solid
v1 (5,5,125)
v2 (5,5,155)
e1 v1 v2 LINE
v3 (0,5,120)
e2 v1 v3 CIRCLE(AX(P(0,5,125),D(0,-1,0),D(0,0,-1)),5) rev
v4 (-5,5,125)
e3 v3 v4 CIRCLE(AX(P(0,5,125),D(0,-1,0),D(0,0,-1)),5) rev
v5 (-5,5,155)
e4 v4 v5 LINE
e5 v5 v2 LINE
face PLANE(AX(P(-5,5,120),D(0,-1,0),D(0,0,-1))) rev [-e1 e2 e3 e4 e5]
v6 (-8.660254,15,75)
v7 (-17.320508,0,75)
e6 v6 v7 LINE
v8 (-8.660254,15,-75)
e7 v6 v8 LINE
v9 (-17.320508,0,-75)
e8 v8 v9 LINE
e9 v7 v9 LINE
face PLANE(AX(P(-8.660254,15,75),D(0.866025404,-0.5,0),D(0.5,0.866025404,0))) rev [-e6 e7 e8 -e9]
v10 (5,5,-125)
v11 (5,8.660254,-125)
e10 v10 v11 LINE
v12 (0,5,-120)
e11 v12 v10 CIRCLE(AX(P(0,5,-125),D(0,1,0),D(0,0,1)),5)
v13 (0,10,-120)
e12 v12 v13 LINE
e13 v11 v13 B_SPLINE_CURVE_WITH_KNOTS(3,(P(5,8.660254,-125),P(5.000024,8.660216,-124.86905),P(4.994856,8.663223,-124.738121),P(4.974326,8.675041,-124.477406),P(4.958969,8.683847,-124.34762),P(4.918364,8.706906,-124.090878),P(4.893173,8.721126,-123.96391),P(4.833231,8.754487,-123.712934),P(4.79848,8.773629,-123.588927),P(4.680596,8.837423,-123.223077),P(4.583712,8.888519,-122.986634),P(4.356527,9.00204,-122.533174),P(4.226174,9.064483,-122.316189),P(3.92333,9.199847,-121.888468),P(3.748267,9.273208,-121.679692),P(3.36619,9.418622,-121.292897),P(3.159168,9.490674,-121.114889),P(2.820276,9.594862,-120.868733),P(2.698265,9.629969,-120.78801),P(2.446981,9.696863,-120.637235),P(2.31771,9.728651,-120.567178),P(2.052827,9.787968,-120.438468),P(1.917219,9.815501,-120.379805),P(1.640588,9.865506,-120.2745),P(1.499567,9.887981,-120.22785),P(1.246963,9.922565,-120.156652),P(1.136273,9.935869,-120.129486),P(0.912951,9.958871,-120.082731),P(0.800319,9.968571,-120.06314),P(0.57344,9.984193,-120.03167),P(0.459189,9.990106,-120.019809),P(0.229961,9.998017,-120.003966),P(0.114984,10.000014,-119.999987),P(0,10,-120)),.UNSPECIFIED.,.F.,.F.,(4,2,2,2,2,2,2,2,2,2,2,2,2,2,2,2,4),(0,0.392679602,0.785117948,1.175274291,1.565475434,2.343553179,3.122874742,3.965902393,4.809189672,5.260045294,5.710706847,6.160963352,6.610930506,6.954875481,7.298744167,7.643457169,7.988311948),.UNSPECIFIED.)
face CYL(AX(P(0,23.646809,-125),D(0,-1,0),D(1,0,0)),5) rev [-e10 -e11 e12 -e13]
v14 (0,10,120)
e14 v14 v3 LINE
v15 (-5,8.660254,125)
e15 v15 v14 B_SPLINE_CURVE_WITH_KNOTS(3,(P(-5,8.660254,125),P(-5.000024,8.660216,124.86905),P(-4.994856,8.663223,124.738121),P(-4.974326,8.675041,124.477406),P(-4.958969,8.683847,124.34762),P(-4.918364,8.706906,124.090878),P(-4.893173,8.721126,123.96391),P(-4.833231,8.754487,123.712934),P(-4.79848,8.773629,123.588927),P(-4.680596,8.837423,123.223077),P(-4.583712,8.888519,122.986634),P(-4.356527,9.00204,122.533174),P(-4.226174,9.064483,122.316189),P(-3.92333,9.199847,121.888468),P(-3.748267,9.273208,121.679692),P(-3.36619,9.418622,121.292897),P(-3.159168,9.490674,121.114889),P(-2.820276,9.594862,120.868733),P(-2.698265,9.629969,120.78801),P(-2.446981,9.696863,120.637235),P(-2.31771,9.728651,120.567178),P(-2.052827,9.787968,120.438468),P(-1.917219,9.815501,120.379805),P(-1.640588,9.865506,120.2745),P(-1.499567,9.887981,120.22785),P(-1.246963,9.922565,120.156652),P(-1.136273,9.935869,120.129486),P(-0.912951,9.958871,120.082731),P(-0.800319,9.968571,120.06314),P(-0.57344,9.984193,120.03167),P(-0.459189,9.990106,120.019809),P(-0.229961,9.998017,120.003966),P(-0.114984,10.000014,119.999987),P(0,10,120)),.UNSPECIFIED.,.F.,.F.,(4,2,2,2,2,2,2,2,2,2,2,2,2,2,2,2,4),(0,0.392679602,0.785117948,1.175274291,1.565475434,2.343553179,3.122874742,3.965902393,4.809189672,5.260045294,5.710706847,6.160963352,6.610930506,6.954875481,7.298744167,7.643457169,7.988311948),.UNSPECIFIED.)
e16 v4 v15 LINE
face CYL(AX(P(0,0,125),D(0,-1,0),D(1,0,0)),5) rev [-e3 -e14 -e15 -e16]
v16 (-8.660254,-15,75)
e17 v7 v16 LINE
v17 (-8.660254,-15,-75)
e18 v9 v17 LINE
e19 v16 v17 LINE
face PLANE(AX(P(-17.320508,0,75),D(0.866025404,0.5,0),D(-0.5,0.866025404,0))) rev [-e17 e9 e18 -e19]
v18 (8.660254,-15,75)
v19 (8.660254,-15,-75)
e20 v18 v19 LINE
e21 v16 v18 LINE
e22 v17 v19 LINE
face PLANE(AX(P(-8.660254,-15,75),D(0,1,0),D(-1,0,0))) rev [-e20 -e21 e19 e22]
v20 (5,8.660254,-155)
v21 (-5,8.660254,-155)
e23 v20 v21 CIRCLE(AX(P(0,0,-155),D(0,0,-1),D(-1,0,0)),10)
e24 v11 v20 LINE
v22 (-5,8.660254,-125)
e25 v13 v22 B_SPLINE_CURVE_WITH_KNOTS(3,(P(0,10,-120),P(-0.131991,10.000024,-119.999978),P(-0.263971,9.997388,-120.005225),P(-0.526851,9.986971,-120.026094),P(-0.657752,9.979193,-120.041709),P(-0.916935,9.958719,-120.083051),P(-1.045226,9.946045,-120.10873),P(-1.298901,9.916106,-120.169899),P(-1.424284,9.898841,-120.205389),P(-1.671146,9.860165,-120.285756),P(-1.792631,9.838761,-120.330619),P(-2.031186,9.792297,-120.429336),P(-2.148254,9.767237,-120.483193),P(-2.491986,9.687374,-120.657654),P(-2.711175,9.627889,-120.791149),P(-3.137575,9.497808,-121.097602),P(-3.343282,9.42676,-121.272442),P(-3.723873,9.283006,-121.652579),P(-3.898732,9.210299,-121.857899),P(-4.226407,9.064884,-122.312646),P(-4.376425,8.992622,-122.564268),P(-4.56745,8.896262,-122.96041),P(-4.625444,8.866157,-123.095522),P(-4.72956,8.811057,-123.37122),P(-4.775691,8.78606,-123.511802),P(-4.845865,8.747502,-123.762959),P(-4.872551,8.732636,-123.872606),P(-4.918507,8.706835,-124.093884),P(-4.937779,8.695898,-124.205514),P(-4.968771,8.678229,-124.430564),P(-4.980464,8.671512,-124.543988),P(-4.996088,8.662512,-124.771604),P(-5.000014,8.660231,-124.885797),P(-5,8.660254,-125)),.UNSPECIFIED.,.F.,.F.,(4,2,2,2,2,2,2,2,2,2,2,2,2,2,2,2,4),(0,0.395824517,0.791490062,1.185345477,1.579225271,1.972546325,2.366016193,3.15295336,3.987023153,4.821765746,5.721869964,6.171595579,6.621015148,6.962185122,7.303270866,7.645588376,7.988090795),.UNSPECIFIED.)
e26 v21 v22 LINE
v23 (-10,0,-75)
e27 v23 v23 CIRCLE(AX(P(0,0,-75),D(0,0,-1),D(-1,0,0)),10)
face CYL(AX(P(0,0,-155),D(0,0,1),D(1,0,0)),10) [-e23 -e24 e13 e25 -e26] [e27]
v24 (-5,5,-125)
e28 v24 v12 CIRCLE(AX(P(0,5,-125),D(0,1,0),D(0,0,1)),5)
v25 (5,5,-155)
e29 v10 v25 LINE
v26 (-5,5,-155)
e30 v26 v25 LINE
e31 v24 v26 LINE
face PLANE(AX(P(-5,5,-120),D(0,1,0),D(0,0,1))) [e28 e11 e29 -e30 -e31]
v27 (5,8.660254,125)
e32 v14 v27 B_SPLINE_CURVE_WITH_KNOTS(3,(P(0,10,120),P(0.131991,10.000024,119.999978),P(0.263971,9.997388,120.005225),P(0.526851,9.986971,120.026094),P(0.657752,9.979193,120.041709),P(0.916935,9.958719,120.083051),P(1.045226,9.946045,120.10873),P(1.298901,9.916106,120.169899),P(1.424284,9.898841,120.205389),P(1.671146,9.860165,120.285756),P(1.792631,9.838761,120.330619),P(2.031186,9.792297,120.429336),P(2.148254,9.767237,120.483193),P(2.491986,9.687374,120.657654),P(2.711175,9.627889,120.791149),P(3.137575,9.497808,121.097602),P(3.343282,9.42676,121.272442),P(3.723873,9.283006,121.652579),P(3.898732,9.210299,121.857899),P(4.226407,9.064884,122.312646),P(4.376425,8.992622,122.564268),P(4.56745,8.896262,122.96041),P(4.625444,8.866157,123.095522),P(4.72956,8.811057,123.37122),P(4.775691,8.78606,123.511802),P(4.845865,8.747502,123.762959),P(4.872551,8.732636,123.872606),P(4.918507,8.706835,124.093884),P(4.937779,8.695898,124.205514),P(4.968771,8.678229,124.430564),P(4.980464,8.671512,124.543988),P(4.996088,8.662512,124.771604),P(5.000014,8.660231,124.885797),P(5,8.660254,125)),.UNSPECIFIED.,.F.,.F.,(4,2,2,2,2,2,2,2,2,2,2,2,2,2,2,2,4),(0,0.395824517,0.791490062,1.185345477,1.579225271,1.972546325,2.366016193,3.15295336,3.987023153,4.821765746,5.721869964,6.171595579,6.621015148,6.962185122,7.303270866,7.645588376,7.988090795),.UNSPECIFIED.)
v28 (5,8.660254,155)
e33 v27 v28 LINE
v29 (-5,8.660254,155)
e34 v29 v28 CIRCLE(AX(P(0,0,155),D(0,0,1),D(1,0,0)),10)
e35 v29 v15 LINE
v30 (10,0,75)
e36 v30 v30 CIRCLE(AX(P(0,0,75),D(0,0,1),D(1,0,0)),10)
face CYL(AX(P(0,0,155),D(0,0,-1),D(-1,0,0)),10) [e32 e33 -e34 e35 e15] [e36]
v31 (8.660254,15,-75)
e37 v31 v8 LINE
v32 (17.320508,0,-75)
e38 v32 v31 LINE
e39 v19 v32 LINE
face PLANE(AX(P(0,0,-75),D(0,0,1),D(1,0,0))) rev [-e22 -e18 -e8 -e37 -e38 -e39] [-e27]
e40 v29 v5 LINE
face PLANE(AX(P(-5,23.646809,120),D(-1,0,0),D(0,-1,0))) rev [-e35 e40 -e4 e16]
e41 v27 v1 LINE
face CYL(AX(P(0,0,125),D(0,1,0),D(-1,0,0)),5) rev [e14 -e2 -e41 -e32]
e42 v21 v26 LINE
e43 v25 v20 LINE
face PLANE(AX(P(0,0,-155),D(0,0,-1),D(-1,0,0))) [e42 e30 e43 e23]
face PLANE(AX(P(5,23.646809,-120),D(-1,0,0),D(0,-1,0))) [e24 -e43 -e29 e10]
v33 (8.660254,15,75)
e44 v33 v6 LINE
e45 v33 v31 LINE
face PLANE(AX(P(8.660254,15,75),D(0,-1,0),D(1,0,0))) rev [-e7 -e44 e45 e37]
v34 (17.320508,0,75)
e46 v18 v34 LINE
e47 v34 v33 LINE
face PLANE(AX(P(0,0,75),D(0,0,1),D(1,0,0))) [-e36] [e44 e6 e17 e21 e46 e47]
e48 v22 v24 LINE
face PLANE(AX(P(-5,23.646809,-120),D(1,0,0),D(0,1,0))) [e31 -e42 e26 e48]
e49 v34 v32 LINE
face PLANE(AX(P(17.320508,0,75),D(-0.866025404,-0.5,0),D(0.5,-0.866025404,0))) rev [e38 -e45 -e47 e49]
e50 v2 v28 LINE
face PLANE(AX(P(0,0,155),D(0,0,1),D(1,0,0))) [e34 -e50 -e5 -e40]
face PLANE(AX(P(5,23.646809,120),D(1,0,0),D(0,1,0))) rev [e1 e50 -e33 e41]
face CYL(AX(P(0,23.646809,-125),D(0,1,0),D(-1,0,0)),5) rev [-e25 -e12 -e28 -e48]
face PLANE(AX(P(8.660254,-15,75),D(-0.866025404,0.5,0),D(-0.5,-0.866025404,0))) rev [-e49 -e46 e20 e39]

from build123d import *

# Parameters (mm, degrees)
BOSS_EXTRUDE1_DEPTH  = 75
SKETCH2_R            = 10
BOSS_EXTRUDE2_DEPTH  = 80
BOSS_EXTRUDE3_START  = 80
SKETCH3_R            = 10
BOSS_EXTRUDE3_DEPTH  = 80
SKETCH4_W            = 10
SKETCH4_H            = 18.646809019
CUT_EXTRUDE1_DEPTH   = 35
FILLET1_R            = 5
FILLET1_OF_MIRROR1_R = 5


with BuildPart() as part:
    # Sketch1 → Boss-Extrude1 (new, symmetric)
    with BuildSketch(Plane.XY):
        Polygon((8.660254038, 15), (-8.660254038, 15), (-17.320508076, 0), (-8.660254038, -15), (8.660254038, -15), (17.320508076, 0), align=None)
    extrude(amount=BOSS_EXTRUDE1_DEPTH, both=True)

    # Sketch2 → Boss-Extrude2 (add)
    with BuildSketch(Plane.XY.offset(75)):
        Circle(SKETCH2_R)
    extrude(amount=BOSS_EXTRUDE2_DEPTH)

    # Sketch3 → Boss-Extrude3 (add)
    with BuildSketch(Plane(origin=(0, 0, -75), x_dir=(-1, 0, 0), z_dir=(0, 0, -1)).offset(BOSS_EXTRUDE3_START)):
        with Locations(Location((0, 0, 0), (0, 0, 180))):
            Circle(SKETCH3_R)
    extrude(amount=-BOSS_EXTRUDE3_DEPTH)

    # Sketch4 → Cut-Extrude1 (cut)
    with BuildSketch(Plane.XY.offset(155)):
        with Locations((0, 14.32340451)):
            Rectangle(SKETCH4_W, SKETCH4_H)
    cut_extrude1 = extrude(amount=-CUT_EXTRUDE1_DEPTH, mode=Mode.SUBTRACT)

    # Fillet1
    fillet1_edges = [part.edges().sort_by_distance(p)[0] for p in [
        (5, 6.830127019, 120),
        (-5, 6.830127019, 120),
    ]]
    fillet(fillet1_edges, radius=FILLET1_R - 0.0001)  # a hair under: the kernel refuses the full size

    # Mirror1: Cut-Extrude1 across plane
    add(cut_extrude1.mirror(Plane.XY), mode=Mode.SUBTRACT)

    # Fillet1 of Mirror1
    fillet1_of_mirror1_edges = [part.edges().sort_by_distance(p)[0] for p in [
        (5, 6.830127019, -120),
        (-5, 6.830127019, -120),
    ]]
    fillet(fillet1_of_mirror1_edges, radius=FILLET1_OF_MIRROR1_R - 0.0001)  # a hair under: the kernel refuses the full size


solid = part.part
